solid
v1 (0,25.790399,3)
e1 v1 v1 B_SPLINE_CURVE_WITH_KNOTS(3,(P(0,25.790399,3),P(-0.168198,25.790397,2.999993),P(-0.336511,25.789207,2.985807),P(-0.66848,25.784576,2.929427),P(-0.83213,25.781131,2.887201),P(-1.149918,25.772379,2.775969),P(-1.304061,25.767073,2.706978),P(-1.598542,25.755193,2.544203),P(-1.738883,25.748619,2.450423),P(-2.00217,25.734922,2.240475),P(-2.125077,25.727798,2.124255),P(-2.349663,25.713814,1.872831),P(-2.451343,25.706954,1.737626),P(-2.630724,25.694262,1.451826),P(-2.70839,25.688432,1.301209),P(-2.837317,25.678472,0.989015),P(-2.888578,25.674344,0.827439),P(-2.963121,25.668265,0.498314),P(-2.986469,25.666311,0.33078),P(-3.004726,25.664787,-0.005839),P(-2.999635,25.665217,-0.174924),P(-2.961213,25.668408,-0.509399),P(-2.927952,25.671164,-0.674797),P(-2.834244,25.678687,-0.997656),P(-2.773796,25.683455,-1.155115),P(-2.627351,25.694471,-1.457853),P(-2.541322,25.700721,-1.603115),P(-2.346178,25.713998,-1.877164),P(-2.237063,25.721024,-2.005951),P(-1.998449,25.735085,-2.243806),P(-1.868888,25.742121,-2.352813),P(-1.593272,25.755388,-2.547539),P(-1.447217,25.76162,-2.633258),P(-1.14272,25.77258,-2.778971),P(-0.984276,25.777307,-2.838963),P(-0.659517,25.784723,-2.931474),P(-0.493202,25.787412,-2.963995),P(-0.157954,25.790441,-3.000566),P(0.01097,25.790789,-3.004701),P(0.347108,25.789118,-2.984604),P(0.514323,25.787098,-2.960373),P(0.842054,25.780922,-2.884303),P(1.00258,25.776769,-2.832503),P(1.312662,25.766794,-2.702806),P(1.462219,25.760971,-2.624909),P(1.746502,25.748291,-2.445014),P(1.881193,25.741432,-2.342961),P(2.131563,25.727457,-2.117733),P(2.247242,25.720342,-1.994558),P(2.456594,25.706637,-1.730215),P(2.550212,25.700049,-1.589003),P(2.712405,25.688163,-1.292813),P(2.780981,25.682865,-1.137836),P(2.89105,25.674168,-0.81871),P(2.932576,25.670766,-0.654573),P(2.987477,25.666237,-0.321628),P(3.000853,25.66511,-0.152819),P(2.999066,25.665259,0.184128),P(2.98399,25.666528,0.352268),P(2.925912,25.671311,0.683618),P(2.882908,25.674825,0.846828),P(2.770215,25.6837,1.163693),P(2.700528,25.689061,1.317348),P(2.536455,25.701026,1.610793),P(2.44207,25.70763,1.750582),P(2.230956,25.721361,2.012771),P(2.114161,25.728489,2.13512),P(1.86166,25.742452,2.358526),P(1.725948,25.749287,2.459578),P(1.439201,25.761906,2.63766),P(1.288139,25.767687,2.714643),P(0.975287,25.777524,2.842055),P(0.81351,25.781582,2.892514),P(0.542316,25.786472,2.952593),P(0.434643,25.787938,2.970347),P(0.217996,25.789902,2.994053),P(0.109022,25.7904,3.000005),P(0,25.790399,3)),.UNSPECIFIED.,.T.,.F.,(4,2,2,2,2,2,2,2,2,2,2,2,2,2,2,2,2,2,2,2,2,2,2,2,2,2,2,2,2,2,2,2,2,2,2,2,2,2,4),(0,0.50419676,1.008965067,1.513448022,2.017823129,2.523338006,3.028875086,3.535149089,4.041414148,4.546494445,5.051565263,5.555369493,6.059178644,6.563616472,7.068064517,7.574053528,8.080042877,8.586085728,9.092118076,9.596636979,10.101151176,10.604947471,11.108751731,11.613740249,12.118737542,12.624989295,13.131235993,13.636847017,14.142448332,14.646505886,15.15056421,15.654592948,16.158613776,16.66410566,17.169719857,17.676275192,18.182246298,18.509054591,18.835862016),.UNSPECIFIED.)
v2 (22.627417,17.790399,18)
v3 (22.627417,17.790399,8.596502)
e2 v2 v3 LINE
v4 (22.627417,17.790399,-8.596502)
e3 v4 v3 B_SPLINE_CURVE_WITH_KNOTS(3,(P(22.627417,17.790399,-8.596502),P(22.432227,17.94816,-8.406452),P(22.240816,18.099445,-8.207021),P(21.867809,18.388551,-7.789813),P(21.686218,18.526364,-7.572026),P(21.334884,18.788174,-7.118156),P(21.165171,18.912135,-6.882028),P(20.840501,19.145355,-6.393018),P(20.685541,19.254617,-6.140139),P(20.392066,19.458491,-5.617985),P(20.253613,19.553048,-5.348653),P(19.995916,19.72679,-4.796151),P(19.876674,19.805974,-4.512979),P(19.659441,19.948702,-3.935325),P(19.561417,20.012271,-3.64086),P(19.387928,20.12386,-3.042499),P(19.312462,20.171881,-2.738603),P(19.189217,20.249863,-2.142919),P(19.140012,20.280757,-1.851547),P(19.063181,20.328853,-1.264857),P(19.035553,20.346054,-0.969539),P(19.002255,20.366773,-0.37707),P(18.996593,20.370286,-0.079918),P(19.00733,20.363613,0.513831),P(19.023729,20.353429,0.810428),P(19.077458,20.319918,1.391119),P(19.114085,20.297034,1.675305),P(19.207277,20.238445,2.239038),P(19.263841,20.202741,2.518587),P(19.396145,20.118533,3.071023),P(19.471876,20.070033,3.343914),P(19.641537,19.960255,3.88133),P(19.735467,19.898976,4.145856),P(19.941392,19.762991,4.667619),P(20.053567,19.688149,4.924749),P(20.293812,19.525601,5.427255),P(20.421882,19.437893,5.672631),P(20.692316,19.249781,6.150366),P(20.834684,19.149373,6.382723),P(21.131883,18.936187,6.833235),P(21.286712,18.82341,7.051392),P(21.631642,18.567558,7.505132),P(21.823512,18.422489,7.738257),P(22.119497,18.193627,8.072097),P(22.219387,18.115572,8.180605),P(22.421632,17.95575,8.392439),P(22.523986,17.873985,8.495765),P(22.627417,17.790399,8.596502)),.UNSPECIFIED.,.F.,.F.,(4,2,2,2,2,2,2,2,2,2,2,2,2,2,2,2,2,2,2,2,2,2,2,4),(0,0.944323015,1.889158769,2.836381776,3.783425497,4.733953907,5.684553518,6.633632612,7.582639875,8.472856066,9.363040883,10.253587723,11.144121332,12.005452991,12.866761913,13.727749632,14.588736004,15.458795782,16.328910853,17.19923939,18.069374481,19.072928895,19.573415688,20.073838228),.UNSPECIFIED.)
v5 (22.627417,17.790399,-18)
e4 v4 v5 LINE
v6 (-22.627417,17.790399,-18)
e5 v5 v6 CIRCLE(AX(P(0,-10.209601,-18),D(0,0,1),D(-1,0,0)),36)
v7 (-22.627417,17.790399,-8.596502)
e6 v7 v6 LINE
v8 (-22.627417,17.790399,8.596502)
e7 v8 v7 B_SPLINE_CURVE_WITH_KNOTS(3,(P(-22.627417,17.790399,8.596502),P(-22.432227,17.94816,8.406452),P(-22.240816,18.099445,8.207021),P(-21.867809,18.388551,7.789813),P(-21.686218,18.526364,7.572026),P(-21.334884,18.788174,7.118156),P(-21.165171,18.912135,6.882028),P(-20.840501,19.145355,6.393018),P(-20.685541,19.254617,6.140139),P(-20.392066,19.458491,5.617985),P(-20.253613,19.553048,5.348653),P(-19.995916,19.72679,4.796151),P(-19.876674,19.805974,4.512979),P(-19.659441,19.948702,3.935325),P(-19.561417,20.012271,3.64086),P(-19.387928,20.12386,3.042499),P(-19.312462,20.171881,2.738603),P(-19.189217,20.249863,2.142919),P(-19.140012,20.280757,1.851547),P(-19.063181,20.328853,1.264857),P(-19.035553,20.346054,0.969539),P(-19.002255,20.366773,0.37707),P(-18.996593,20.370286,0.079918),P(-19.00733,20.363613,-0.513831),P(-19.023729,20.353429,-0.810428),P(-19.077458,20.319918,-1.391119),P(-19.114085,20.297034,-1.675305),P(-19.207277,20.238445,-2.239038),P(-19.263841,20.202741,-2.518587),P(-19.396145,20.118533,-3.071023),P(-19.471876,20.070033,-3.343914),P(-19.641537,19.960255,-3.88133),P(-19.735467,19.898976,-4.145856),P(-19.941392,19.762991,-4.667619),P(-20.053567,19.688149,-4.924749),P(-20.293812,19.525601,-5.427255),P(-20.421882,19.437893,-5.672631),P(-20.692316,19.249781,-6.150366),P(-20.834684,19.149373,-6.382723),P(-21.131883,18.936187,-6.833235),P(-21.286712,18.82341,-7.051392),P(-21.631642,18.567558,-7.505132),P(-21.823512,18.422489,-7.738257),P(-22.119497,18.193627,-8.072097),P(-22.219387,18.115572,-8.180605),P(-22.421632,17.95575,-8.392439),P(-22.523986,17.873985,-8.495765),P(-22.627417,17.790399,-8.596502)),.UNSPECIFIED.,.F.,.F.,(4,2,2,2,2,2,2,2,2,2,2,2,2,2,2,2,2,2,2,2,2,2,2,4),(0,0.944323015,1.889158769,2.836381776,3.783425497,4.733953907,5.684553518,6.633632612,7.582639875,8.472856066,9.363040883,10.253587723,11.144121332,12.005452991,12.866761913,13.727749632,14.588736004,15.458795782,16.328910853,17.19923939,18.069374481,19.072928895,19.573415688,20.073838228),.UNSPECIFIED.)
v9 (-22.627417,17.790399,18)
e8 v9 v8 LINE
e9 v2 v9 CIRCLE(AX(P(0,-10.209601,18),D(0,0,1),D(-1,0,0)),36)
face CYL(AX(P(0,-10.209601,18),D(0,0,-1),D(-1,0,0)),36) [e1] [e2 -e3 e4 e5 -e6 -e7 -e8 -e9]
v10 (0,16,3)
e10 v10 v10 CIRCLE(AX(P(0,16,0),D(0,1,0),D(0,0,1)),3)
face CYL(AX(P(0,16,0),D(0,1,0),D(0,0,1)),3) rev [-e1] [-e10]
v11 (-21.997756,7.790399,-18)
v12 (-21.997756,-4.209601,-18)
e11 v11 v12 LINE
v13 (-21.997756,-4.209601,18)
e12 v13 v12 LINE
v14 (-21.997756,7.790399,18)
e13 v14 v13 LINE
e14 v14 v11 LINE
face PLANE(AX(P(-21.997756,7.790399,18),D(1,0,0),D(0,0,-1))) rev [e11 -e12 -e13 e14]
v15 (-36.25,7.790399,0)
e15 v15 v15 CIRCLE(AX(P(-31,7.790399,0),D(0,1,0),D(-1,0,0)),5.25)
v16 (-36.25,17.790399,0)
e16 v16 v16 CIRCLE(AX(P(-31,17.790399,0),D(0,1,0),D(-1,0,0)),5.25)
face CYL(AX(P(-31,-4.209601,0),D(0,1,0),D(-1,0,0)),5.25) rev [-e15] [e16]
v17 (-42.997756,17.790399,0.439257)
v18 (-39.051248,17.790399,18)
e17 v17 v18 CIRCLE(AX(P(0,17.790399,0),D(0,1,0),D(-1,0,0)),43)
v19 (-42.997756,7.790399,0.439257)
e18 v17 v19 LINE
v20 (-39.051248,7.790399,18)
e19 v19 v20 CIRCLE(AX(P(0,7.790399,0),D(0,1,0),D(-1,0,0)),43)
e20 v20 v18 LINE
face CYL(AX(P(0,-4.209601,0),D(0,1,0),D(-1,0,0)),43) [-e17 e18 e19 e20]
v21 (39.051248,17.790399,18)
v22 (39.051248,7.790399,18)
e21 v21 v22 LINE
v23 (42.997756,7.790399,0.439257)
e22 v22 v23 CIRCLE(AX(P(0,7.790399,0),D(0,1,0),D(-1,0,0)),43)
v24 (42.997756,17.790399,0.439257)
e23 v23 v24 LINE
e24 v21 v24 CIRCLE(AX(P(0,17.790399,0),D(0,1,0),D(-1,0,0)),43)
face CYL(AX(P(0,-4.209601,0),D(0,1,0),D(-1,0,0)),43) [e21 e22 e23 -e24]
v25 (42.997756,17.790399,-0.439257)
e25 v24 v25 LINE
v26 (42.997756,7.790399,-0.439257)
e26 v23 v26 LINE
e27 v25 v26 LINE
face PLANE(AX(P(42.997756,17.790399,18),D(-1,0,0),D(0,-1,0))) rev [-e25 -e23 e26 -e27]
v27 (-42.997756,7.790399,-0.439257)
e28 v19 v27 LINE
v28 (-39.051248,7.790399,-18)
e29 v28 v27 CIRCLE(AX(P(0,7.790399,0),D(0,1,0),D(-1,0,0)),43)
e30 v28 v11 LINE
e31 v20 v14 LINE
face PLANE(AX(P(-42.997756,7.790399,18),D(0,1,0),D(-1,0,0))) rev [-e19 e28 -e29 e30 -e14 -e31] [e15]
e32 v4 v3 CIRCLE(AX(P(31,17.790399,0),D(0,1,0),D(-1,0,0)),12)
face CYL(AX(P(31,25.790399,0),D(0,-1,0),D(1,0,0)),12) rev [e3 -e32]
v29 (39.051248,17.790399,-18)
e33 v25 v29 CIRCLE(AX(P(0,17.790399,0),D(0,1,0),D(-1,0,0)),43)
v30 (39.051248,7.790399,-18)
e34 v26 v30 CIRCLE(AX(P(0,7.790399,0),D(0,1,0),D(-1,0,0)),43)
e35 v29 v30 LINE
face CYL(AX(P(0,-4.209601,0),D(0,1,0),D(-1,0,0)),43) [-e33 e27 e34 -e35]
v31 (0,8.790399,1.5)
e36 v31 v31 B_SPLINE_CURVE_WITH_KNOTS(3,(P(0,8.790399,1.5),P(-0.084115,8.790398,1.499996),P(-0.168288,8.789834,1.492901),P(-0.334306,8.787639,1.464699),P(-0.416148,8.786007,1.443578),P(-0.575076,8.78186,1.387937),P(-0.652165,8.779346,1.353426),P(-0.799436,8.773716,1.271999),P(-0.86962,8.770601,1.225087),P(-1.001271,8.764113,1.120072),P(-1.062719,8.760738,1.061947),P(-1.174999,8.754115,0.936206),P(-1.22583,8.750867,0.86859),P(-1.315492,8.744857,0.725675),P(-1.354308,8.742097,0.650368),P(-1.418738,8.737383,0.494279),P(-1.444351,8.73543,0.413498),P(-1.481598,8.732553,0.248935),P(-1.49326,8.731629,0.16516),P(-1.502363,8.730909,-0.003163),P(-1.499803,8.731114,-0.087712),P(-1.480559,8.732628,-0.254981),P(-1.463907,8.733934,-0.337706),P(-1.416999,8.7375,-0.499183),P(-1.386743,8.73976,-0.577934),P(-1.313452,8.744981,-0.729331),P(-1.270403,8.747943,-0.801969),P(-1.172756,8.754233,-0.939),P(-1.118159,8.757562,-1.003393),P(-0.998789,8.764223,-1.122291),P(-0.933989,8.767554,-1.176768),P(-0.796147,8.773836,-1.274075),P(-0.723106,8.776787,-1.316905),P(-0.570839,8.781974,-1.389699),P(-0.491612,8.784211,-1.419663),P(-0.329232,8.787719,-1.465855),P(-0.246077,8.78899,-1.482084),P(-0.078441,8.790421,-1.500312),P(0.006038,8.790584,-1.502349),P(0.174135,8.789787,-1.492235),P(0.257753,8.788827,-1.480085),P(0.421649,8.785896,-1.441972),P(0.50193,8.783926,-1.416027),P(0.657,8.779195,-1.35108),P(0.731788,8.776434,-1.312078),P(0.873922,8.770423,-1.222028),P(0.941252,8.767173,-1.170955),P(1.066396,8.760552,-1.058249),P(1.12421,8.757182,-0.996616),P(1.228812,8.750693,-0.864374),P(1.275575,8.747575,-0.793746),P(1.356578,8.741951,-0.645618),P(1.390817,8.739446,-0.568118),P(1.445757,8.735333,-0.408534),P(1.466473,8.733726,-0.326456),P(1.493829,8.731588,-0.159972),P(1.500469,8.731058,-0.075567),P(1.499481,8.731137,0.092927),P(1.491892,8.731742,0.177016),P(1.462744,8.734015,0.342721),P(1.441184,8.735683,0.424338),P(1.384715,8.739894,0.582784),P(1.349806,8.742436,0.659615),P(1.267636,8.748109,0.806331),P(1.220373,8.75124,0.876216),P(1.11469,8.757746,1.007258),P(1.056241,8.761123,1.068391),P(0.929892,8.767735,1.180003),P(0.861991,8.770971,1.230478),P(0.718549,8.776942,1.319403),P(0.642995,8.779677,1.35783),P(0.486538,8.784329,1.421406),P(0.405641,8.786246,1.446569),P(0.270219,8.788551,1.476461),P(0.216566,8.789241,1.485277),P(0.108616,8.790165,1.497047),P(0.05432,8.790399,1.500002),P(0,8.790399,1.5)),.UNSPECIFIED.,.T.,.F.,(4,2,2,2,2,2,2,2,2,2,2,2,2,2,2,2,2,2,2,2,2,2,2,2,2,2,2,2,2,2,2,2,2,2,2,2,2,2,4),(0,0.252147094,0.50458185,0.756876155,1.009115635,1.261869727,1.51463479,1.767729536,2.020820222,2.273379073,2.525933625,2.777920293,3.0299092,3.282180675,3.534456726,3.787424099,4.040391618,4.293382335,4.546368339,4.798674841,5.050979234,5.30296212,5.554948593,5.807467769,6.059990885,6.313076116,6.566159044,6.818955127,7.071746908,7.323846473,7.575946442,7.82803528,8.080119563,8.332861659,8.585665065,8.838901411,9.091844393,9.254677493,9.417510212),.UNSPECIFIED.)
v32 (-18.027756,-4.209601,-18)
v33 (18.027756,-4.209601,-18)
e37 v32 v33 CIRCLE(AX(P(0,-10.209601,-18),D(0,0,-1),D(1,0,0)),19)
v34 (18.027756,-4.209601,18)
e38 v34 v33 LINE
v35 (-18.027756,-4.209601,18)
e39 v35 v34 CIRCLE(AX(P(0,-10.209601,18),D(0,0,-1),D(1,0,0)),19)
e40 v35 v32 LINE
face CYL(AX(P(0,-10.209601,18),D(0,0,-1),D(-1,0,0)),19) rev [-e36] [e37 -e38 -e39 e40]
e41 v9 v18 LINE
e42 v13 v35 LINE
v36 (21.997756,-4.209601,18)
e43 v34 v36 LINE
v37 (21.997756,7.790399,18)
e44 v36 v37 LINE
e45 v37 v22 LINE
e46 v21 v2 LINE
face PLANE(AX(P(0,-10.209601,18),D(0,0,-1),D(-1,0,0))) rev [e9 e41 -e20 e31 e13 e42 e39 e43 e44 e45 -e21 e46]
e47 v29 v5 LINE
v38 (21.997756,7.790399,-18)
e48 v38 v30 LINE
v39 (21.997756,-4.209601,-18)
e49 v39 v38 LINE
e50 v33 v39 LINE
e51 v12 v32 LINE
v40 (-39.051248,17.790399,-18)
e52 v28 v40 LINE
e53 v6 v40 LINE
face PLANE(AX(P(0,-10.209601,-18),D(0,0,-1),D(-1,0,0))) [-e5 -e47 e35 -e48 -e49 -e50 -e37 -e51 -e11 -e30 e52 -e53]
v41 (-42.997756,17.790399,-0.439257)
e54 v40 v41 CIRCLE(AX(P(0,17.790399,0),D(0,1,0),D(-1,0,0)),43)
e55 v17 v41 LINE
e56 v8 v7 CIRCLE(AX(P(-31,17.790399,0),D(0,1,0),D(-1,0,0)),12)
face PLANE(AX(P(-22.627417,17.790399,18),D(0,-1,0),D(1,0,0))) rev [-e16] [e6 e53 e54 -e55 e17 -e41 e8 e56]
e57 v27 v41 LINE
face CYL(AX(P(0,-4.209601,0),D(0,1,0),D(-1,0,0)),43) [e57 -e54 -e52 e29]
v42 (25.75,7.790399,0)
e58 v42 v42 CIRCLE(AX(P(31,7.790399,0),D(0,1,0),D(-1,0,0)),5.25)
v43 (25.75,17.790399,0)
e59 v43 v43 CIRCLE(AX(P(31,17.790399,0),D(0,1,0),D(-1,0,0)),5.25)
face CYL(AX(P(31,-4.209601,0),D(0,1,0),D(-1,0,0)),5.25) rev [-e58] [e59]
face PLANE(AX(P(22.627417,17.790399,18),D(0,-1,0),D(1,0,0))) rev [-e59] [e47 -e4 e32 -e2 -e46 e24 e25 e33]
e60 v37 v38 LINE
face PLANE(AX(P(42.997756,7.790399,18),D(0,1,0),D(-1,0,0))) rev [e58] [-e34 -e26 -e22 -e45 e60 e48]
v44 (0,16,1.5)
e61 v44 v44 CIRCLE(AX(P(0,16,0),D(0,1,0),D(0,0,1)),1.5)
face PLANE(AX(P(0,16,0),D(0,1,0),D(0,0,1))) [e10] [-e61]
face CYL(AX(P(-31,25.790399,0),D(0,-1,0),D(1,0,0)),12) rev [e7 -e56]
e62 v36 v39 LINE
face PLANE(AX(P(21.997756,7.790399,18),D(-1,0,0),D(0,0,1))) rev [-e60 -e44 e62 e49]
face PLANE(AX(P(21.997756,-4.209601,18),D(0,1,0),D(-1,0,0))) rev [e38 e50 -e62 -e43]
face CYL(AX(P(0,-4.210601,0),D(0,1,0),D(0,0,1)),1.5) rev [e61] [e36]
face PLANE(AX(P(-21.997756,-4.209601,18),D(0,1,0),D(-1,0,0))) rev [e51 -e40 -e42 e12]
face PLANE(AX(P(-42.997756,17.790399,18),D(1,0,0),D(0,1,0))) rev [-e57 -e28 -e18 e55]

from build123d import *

# Parameters (mm, degrees)
BOSS_EXTRUDE1_DEPTH     = 18
SKETCH2_R               = 5.25
CUT_EXTRUDE1_DEPTH      = 52.54422425
CUT_EXTRUDE2_START      = -10
CUT_EXTRUDE2_DEPTH      = 10
CUT_EXTRUDE3_DEPTH      = 52.54422425
CUT_EXTRUDE4_DEPTH      = 52.544224284
SKETCH6_R               = 3
CUT_EXTRUDE5_DEPTH      = 10
CUT_EXTRUDE6_REACH      = 52.806
CUT_EXTRUDE6_END_RADIUS = 19
SKETCH7_R               = 1.5


# Read off the part's stored shape, not the designer's step: Cut-Extrude2
with BuildPart() as part:
    # Sketch1 → Boss-Extrude1 (new, symmetric)
    with BuildSketch(Plane.XY):
        with BuildLine():
            Line((22.627416998, 17.790398646), (42.997756377, 17.790398646))
            Line((42.997756377, 17.790398646), (42.997756377, 7.790398646))
            Line((42.997756377, 7.790398646), (21.997756377, 7.790398646))
            Line((21.997756377, 7.790398646), (21.997756377, -4.209601354))
            Line((21.997756377, -4.209601354), (18.027756377, -4.209601354))
            ThreePointArc((18.027756377, -4.209601354), (0, 8.790398646), (-18.027756377, -4.209601354))
            Line((-18.027756377, -4.209601354), (-21.997756377, -4.209601354))
            Line((-21.997756377, -4.209601354), (-21.997756377, 7.790398646))
            Line((-21.997756377, 7.790398646), (-42.997756377, 7.790398646))
            Line((-42.997756377, 7.790398646), (-42.997756377, 17.790398646))
            Line((-42.997756377, 17.790398646), (-22.627416998, 17.790398646))
            ThreePointArc((-22.627416998, 17.790398646), (0, 25.790398646), (22.627416998, 17.790398646))
        make_face()
    extrude(amount=BOSS_EXTRUDE1_DEPTH, both=True)

    # Sketch2 → Cut-Extrude1 (cut, through all)
    with BuildSketch(Plane(origin=(0, 17.790398646, 0), x_dir=(1, 0, 0), z_dir=(0, 1, 0))):
        with Locations(Location((-31, 0, 0), (0, 0, 180))):
            Circle(SKETCH2_R)
        with Locations(Location((31, 0, 0), (0, 0, 180))):
            Circle(SKETCH2_R)
    extrude(amount=-CUT_EXTRUDE1_DEPTH, mode=Mode.SUBTRACT)

    # Cut-Extrude2 outline → Cut-Extrude2 (cut)
    with BuildSketch(Plane(origin=(0, 17.790398646, 0), x_dir=(1, 0, 0), z_dir=(0, 1, 0)).offset(CUT_EXTRUDE2_START)):
        with BuildLine():
            ThreePointArc((39.05124838, 18), (41.953602003, 9.428429295), (42.997756377, 0.439256778))
            Line((42.997756377, 0.439256778), (42.997756377, 18))
            Line((42.997756377, 18), (39.05124838, 18))
        make_face()
        with BuildLine():
            Line((42.997756377, -18), (42.997756377, -0.439256778))
            ThreePointArc((42.997756377, -0.439256778), (41.953602003, -9.428429295), (39.05124838, -18))
            Line((39.05124838, -18), (42.997756377, -18))
        make_face()
        with BuildLine():
            ThreePointArc((-42.997756377, 0.439256778), (-41.953602003, 9.428429295), (-39.05124838, 18))
            Line((-39.05124838, 18), (-42.997756377, 18))
            Line((-42.997756377, 18), (-42.997756377, 0.439256778))
        make_face()
        with BuildLine():
            Line((-42.997756377, -18), (-39.05124838, -18))
            ThreePointArc((-39.05124838, -18), (-41.953602003, -9.428429295), (-42.997756377, -0.439256778))
            Line((-42.997756377, -0.439256778), (-42.997756377, -18))
        make_face()
    extrude(amount=CUT_EXTRUDE2_DEPTH, mode=Mode.SUBTRACT)

    # Sketch4 → Cut-Extrude3 (cut, through all)
    with BuildSketch(Plane(origin=(0, 17.790398646, 0), x_dir=(1, 0, 0), z_dir=(0, 1, 0))):
        with BuildLine():
            Line((-22.627416998, 8.596502421), (-22.627416998, -8.596502421))
            ThreePointArc((-22.627416998, -8.596502421), (-19, 0), (-22.627416998, 8.596502421))
        make_face()
    extrude(amount=CUT_EXTRUDE3_DEPTH, mode=Mode.SUBTRACT)

    # Sketch5 → Cut-Extrude4 (cut, through all)
    with BuildSketch(Plane(origin=(0, 17.790398646, 0), x_dir=(1, 0, 0), z_dir=(0, 1, 0))):
        with BuildLine():
            Line((22.627416998, 8.596502421), (22.627416998, -8.596502421))
            ThreePointArc((22.627416998, -8.596502421), (19, 0), (22.627416998, 8.596502421))
        make_face()
    extrude(amount=CUT_EXTRUDE4_DEPTH, mode=Mode.SUBTRACT)

    # Sketch6 → Cut-Extrude5 (cut)
    with BuildSketch(Plane(origin=(0, 26, 0), x_dir=(1, 0, 0), z_dir=(0, 1, 0))):
        with Locations(Location((0, 0, 0), (0, 0, 270))):
            Circle(SKETCH6_R)
    extrude(amount=-CUT_EXTRUDE5_DEPTH, mode=Mode.SUBTRACT)

    # Cut-Extrude6: up to this cylinder (the profile starts outside it)
    cut_extrude6_end = Plane(origin=(0, -10.209601354, 0), z_dir=(0, 0, -1)) * Cylinder(CUT_EXTRUDE6_END_RADIUS, 144.612, mode=Mode.PRIVATE)
    # Sketch7 → Cut-Extrude6 (cut, up to the surface)
    with BuildSketch(Plane(origin=(0, 16, 0), x_dir=(1, 0, 0), z_dir=(0, 1, 0)), mode=Mode.PRIVATE) as cut_extrude6_sk1:
        with Locations(Location((0, 0, 0), (0, 0, 270))):
            Circle(SKETCH7_R)
    cut_extrude6_tool1 = extrude(cut_extrude6_sk1.sketch, amount=-CUT_EXTRUDE6_REACH, mode=Mode.PRIVATE) - cut_extrude6_end
    add(cut_extrude6_tool1.solids().sort_by_distance((0, 16, 0))[0], mode=Mode.SUBTRACT)


solid = part.part
